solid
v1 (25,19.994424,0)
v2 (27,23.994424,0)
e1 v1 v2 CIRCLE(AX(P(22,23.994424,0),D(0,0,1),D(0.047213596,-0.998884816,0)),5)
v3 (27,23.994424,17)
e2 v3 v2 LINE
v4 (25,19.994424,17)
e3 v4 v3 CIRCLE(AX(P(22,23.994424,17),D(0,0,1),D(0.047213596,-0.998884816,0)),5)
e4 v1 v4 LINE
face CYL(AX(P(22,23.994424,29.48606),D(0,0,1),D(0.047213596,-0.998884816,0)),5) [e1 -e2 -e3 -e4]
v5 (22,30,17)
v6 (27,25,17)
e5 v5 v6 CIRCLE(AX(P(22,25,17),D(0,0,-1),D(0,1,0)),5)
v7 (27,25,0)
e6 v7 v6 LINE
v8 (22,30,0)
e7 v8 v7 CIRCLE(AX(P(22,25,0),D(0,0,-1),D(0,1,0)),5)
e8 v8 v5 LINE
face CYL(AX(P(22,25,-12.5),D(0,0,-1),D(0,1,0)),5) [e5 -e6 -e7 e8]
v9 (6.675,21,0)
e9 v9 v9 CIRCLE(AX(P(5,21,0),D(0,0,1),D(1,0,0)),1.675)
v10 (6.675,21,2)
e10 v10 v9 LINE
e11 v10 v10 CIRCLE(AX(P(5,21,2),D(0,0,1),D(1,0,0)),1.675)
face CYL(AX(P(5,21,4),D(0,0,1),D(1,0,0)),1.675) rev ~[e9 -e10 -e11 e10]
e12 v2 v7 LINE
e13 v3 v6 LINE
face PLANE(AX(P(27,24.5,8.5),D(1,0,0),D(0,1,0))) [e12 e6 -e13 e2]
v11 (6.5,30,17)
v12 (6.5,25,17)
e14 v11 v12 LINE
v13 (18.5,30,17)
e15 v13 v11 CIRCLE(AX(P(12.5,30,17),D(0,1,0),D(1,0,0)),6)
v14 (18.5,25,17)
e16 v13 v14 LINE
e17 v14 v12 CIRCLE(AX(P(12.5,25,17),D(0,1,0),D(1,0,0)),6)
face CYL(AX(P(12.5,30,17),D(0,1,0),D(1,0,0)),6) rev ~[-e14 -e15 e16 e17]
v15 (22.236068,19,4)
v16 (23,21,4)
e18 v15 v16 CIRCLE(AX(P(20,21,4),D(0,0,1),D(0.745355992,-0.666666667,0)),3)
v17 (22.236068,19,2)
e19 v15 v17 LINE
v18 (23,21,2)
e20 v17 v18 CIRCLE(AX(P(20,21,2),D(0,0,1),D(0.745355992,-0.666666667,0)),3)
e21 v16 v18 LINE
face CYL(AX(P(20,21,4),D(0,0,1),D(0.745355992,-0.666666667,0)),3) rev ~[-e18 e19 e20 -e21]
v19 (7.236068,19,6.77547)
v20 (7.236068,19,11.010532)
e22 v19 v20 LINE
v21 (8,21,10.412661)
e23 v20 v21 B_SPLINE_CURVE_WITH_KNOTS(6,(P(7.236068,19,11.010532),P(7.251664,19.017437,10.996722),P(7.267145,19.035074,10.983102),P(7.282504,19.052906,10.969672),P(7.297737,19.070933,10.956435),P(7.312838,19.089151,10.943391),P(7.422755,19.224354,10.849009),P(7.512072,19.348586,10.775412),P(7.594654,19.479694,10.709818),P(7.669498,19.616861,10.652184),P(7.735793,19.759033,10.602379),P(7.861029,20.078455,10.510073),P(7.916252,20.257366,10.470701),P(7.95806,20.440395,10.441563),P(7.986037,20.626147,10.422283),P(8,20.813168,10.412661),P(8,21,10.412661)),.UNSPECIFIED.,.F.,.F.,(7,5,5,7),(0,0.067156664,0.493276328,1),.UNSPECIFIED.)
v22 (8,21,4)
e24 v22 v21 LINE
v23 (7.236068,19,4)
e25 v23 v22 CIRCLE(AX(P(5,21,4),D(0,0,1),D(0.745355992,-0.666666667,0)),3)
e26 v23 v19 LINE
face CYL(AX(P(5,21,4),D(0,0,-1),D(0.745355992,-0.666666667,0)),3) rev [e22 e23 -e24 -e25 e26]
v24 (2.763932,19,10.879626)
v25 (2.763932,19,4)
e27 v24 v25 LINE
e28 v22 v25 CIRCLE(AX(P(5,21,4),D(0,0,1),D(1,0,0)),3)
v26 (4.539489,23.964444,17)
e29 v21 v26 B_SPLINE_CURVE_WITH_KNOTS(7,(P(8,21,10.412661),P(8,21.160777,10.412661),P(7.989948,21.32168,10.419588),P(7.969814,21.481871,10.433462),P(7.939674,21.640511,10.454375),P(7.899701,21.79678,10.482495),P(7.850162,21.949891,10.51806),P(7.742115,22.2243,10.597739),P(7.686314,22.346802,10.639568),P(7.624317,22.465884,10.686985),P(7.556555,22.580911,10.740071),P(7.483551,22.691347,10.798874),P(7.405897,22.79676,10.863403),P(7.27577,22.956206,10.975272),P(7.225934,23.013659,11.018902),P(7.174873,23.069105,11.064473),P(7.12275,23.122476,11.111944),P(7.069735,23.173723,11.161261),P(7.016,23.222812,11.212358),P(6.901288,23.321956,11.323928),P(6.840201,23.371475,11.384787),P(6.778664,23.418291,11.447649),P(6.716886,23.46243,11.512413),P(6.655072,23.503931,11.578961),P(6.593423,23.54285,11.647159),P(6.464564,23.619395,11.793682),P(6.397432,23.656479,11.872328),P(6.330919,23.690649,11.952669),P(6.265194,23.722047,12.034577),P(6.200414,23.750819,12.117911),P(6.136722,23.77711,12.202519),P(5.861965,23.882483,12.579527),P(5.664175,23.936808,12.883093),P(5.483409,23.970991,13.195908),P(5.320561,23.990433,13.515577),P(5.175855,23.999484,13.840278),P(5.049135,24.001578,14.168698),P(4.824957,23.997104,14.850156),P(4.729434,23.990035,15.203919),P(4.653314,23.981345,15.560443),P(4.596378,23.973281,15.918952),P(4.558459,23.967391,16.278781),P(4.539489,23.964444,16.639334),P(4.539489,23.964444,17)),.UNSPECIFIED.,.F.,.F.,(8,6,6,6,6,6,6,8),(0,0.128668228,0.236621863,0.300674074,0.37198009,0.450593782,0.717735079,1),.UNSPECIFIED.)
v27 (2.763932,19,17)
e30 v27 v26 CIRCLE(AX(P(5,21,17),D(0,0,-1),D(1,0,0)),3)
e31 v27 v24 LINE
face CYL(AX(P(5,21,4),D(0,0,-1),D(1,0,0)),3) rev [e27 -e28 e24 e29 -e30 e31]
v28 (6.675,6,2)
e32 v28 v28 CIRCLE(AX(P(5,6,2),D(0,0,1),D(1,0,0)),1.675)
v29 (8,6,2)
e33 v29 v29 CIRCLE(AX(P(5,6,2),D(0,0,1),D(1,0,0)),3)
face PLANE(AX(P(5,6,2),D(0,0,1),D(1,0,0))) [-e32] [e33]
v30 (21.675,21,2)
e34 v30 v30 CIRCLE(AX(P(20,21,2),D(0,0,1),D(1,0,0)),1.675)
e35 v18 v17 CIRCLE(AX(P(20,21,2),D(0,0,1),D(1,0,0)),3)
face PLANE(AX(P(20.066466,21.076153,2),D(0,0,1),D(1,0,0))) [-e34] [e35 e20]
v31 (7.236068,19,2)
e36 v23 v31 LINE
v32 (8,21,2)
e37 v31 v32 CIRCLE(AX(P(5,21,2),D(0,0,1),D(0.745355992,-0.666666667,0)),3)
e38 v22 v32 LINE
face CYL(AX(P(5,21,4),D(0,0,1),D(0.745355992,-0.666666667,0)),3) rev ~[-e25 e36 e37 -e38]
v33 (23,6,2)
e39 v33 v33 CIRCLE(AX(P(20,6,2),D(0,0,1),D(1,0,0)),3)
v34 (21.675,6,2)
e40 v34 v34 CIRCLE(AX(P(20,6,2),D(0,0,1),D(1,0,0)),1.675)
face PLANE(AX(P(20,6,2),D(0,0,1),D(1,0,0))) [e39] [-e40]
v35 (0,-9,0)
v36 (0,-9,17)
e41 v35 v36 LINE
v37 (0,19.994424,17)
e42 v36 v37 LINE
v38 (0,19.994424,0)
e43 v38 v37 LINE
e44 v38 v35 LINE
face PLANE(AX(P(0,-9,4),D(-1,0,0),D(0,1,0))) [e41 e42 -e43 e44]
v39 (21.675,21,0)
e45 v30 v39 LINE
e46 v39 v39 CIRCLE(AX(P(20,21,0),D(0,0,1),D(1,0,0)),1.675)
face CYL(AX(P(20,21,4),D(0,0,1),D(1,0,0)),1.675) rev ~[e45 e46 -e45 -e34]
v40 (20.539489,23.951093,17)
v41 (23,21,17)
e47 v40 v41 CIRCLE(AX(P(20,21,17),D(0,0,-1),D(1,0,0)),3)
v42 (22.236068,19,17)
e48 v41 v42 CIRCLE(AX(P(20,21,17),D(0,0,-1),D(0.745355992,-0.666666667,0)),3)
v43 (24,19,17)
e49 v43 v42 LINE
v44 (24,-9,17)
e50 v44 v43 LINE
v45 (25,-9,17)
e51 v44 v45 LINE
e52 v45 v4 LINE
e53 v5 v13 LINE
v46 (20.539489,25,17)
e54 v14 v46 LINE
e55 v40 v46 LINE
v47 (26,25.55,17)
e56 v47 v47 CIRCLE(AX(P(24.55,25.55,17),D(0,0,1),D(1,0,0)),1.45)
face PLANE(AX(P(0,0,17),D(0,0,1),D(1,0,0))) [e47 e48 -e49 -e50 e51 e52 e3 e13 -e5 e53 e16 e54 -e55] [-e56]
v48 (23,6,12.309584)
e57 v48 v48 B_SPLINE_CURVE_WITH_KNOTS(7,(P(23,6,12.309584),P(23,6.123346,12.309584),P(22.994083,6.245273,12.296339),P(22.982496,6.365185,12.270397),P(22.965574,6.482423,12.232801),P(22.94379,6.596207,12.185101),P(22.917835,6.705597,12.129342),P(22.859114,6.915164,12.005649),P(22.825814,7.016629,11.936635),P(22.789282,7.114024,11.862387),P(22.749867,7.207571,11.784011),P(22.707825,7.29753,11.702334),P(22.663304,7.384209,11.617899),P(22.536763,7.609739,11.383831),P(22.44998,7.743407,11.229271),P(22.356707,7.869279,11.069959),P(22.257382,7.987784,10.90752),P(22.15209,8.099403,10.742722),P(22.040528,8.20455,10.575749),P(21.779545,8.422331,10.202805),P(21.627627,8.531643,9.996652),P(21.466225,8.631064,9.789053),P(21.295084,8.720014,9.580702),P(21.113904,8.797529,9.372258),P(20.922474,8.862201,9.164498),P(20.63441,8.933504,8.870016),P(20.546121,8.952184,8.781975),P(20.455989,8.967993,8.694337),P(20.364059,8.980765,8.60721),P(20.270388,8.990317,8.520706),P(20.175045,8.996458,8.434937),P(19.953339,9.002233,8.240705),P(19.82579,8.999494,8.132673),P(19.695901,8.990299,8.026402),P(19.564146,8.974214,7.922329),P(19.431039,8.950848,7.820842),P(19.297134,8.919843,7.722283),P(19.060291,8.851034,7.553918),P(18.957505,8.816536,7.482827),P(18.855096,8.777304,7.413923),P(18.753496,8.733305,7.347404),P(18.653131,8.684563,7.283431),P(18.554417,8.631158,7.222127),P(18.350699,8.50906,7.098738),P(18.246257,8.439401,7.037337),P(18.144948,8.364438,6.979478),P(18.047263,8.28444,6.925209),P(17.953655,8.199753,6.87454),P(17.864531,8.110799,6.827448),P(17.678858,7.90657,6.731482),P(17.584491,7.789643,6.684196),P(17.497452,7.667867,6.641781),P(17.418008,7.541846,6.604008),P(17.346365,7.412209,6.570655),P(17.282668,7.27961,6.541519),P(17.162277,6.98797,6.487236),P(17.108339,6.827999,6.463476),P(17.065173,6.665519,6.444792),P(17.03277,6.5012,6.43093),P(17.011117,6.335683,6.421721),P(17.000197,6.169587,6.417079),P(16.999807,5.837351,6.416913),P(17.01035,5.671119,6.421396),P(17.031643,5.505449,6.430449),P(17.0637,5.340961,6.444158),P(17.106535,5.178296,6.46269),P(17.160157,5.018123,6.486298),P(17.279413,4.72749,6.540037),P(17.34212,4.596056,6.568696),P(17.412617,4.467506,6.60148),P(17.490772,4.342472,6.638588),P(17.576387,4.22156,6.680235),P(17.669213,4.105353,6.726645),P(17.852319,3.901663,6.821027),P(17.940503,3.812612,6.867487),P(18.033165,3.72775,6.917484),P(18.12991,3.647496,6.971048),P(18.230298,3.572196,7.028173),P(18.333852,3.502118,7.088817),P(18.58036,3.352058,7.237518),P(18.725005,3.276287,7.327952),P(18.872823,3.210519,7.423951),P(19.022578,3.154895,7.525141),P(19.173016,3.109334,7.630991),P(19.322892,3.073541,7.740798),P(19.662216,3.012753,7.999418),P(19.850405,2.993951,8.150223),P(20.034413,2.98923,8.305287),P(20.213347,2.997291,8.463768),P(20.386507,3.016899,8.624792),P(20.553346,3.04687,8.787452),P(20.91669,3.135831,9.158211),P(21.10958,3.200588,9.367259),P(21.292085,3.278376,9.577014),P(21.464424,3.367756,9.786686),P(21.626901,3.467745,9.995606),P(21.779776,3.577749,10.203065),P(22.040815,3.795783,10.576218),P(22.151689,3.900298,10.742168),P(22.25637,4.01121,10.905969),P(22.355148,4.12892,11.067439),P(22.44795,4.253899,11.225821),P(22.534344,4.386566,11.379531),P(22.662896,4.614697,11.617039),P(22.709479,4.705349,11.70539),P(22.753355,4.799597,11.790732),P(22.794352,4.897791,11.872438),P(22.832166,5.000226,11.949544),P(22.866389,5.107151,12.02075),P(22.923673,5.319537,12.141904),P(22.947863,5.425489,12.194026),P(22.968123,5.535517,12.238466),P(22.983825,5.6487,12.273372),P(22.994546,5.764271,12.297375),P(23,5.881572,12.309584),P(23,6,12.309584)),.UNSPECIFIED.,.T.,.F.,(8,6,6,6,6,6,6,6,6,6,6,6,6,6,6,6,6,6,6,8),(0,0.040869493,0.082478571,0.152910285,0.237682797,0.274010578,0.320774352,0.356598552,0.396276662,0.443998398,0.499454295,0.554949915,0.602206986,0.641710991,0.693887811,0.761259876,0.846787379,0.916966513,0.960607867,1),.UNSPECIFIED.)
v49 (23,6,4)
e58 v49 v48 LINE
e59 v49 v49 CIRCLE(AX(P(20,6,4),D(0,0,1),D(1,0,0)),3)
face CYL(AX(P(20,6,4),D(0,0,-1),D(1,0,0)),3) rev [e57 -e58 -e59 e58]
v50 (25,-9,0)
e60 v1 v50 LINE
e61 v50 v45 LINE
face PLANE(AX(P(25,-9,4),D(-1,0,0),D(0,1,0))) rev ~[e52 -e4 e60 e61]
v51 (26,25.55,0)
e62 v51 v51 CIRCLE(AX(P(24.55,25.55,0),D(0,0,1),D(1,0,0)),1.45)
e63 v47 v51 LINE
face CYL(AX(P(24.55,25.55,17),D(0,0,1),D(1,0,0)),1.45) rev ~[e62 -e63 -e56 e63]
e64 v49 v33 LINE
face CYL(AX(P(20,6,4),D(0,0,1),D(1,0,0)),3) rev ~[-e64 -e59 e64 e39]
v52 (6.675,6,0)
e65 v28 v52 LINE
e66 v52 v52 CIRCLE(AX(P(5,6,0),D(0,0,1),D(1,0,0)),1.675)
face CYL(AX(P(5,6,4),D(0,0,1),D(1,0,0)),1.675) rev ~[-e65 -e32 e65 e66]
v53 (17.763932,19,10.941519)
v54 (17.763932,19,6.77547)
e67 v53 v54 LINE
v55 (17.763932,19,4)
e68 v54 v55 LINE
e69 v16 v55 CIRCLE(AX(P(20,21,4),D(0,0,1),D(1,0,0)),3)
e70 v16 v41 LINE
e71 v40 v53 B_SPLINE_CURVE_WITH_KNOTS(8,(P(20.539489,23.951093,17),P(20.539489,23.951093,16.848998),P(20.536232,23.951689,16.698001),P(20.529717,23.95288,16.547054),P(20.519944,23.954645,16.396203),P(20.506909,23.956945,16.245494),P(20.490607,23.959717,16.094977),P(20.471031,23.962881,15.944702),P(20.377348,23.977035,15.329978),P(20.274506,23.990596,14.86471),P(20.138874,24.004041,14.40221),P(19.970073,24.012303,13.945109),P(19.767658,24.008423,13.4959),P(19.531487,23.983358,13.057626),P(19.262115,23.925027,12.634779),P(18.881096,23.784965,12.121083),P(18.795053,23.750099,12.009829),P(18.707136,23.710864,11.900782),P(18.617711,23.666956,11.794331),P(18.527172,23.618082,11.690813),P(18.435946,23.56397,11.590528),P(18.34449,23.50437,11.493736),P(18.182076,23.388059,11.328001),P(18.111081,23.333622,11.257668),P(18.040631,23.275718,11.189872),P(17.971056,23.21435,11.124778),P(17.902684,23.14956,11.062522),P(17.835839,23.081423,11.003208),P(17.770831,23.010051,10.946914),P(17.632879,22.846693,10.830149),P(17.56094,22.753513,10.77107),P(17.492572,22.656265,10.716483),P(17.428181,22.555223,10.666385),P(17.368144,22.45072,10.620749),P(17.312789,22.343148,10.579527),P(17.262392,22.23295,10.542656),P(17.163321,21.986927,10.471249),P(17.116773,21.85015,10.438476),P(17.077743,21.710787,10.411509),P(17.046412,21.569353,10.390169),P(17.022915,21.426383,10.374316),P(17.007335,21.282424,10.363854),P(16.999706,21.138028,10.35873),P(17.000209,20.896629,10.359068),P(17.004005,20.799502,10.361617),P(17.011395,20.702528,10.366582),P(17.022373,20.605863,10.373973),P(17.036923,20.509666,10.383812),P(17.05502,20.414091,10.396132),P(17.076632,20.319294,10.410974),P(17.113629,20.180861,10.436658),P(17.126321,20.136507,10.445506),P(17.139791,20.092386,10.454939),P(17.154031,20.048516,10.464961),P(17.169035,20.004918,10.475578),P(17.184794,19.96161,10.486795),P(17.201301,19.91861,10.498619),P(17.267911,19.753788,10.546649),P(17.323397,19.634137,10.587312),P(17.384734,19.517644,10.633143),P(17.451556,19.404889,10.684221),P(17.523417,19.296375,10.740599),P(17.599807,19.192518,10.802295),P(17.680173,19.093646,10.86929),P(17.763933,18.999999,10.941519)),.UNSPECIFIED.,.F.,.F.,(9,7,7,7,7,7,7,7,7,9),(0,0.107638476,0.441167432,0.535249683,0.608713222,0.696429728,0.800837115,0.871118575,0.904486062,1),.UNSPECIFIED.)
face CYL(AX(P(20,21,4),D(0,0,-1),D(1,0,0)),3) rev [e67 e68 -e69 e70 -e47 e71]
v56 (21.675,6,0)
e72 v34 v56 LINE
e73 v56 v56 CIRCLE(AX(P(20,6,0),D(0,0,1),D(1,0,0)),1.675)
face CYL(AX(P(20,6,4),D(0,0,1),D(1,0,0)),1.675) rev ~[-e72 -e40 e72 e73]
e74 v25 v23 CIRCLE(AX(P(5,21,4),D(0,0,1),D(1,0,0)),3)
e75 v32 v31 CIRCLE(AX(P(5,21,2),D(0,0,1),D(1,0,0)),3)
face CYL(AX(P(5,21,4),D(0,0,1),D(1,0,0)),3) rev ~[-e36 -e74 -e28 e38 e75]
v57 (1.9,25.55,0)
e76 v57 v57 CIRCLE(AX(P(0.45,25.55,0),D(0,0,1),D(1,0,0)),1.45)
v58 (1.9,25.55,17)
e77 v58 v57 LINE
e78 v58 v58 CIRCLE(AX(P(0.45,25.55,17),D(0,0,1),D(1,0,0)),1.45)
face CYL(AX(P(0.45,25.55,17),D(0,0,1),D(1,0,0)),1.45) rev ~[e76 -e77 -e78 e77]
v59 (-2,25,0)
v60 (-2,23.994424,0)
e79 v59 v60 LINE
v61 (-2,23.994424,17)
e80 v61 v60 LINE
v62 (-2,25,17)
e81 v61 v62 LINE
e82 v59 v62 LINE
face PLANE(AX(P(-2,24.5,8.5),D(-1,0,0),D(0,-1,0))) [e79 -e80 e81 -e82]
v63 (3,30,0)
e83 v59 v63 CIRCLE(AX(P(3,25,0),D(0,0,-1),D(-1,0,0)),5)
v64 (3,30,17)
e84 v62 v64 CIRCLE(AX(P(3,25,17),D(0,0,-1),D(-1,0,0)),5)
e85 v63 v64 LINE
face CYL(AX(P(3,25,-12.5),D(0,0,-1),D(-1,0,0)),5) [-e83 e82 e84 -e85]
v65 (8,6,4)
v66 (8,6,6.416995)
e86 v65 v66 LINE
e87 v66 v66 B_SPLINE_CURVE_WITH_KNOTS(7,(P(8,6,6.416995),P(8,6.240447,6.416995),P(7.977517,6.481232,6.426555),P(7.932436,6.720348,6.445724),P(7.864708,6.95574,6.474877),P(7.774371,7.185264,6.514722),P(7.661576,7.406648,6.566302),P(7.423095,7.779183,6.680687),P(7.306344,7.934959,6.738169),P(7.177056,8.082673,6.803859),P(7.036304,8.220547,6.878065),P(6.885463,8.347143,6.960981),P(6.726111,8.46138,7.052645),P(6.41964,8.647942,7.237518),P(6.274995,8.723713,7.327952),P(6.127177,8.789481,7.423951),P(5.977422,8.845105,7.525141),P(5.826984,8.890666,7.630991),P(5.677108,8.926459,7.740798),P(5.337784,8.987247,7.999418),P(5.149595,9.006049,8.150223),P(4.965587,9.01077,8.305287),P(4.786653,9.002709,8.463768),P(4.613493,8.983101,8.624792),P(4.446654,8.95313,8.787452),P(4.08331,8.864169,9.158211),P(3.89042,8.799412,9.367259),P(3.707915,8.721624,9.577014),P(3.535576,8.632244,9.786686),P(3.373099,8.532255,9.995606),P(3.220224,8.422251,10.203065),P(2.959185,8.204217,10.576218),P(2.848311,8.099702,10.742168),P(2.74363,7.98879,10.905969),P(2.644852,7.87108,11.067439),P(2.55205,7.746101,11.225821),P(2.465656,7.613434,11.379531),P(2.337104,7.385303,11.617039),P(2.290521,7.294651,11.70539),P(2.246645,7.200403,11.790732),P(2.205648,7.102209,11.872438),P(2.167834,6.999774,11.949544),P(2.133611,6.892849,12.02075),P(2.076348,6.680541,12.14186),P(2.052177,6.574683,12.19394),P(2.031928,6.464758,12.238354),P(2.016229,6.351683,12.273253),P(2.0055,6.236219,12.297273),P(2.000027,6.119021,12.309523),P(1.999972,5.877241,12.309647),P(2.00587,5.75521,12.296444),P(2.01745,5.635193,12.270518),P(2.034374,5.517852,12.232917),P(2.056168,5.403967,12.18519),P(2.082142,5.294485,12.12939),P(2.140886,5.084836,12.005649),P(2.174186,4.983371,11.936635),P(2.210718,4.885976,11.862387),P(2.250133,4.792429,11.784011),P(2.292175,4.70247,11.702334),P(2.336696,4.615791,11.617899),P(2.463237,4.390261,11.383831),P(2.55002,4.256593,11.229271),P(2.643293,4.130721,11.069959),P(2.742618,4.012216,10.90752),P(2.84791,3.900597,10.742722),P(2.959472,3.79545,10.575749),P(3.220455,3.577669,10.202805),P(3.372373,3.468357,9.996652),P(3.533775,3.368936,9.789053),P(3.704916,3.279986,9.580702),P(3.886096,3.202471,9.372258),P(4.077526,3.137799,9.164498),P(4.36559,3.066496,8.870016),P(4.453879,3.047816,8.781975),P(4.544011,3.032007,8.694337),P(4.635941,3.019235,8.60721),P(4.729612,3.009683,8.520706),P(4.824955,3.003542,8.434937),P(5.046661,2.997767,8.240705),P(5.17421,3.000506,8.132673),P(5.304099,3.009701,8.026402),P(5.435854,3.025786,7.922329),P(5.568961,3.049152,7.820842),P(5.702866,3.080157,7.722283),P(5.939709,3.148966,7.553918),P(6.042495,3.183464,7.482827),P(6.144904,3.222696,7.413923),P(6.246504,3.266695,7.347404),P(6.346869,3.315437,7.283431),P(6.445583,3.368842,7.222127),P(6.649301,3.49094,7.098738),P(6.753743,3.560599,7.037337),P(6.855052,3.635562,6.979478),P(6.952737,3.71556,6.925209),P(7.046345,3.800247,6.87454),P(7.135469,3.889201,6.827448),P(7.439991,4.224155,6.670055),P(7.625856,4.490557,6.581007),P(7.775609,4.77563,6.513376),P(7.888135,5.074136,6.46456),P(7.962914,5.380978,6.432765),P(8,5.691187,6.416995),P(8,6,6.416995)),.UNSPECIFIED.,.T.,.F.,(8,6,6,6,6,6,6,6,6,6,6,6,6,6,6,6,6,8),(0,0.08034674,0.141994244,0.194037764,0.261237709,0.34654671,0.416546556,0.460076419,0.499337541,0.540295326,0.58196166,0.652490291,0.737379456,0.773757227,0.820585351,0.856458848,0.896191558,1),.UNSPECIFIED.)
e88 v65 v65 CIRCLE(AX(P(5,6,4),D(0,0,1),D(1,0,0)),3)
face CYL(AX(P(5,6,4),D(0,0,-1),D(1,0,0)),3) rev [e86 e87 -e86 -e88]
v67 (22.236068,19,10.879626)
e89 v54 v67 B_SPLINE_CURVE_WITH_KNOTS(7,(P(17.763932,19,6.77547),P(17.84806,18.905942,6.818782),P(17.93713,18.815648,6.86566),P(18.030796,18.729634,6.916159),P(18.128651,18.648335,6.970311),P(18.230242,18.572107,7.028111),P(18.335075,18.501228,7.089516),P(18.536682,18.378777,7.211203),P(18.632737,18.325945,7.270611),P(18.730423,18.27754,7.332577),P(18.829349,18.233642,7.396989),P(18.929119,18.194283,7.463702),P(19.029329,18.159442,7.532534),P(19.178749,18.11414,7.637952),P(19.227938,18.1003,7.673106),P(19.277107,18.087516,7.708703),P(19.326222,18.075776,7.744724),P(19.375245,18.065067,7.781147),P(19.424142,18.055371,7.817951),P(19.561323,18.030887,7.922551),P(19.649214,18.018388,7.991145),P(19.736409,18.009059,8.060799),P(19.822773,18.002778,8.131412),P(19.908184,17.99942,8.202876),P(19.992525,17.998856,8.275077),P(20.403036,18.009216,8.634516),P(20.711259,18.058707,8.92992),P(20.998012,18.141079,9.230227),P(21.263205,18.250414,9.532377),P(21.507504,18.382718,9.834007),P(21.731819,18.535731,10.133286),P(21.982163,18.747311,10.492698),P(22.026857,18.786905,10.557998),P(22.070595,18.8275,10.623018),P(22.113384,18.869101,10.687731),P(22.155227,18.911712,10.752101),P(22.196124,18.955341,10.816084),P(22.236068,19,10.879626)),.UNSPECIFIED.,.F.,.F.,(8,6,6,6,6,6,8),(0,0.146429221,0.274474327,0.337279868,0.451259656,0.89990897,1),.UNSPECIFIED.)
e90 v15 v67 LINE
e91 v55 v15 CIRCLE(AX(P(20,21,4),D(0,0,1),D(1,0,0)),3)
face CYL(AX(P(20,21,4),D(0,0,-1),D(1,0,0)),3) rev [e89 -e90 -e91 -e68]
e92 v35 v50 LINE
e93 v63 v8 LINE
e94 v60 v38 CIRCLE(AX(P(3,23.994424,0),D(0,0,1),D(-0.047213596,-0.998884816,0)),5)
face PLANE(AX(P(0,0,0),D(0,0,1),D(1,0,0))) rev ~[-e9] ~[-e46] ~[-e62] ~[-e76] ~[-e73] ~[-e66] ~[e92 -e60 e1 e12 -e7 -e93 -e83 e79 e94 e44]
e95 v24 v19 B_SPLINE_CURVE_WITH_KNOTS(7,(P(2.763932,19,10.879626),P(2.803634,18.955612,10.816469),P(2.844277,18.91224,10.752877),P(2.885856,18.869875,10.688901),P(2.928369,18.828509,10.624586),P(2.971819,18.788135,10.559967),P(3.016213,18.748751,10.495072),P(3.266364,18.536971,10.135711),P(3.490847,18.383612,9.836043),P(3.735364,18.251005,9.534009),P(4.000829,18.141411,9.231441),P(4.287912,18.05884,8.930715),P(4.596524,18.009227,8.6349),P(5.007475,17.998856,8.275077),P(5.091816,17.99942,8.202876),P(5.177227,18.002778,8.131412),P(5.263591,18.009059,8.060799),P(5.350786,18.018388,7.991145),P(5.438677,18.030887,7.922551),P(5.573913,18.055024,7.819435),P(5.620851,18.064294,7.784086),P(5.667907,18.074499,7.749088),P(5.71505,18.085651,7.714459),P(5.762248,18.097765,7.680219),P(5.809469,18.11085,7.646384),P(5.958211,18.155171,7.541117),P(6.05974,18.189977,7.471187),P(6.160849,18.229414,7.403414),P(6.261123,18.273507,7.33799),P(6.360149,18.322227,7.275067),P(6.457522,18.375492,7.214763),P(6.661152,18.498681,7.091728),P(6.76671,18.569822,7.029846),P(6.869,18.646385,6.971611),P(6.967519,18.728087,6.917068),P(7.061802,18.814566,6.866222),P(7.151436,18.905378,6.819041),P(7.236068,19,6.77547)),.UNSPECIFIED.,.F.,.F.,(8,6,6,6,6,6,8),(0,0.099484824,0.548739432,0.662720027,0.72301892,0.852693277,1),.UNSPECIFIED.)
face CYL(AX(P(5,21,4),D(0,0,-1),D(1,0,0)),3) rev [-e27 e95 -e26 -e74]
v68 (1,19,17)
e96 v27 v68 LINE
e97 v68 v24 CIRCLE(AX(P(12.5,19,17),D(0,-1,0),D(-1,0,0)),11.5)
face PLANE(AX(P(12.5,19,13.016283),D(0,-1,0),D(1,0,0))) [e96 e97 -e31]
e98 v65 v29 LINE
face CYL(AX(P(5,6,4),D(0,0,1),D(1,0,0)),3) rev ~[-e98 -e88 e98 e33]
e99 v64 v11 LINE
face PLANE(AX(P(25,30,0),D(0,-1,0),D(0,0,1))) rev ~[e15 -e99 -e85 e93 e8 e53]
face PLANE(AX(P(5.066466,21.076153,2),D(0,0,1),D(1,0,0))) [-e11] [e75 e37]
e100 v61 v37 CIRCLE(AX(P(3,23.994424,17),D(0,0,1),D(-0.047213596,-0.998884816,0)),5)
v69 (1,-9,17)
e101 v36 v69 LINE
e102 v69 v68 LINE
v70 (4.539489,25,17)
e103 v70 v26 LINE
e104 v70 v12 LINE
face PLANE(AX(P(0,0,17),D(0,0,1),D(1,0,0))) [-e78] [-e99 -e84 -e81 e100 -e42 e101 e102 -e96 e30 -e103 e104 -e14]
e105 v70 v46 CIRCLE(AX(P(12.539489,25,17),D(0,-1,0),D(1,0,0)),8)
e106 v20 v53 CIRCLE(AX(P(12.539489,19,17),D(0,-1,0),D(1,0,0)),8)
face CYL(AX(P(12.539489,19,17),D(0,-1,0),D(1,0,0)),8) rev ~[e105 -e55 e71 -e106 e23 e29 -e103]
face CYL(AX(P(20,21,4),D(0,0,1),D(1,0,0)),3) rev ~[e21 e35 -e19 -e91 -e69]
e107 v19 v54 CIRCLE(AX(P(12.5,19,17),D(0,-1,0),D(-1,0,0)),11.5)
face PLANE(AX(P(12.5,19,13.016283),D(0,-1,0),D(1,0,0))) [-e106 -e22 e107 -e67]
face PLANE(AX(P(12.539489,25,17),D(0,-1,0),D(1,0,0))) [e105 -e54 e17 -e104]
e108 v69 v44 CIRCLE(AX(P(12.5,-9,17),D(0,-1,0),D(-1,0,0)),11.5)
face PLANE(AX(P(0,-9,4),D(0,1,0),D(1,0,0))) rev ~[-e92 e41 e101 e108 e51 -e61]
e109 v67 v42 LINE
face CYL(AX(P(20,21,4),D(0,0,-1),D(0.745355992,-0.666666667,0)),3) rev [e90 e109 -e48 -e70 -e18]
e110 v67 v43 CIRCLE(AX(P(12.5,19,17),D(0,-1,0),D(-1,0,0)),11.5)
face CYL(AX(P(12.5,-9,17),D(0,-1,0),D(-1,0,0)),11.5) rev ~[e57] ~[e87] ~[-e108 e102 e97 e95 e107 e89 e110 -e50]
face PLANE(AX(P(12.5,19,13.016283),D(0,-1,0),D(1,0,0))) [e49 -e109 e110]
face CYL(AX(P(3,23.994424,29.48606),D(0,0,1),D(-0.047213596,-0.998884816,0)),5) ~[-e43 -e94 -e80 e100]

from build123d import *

# Parameters (mm, degrees)
F0_W           = 25
F0_H           = 30
F1_DEPTH       = 4
F2_W           = 25
F2_H           = 11
F3_DEPTH       = 13
F4_R           = 1.675
F5_DEPTH       = 25
F5_DEPTH_BACK  = 25
F7_DEPTH       = 6
F8_R           = 8
F9_DEPTH       = 6
F4_R_2         = 3
F10_DEPTH      = 2
F10_DEPTH_BACK = 25
F12_DEPTH      = 2
F13_W          = 11
F13_H          = 17
F14_DEPTH      = 2
F15_R          = 1.45
F16_DEPTH      = 25
F17_T1_DEPTH   = 42
F17_T6_DEPTH   = 41.9721204096
F17_T11_DEPTH  = 41.9721204096
F18_DEPTH      = 9
F19_DEPTH      = 13
F21_DEPTH      = 28


# Not quite as in the source:
# - a fillet or chamfer that OpenCascade refuses, or shapes differently, is made with other operations: its cross-section is extruded or revolved along the edge and cut away or added
# - a feature names something its author has since deleted; it is built from what else it names


with BuildPart() as f1:
    # F0 (on Top) → F1 (new body)
    with BuildSketch(Plane.XY):
        with Locations((12.5, 15)):
            Rectangle(F0_W, F0_H)
    extrude(amount=F1_DEPTH)

    # F2 (on face) → F3 (join)
    with BuildSketch(Plane.XY.offset(4)):
        with Locations((12.5, 24.5)):
            Rectangle(F2_W, F2_H)
    extrude(amount=F3_DEPTH)

    # F4 (on face) → F5 (cut, two sides)
    with BuildSketch(Plane.XY.offset(4)) as f5_sk:
        with Locations((5, 21)):
            Circle(F4_R)
        with Locations((20, 21)):
            Circle(F4_R)
        with Locations((20, 6)):
            Circle(F4_R)
        with Locations((5, 6)):
            Circle(F4_R)
    extrude(amount=-F5_DEPTH, mode=Mode.SUBTRACT)
    extrude(f5_sk.sketch, amount=F5_DEPTH_BACK, mode=Mode.SUBTRACT)

    # F6 (on face) → F7 (cut)
    with BuildSketch(Plane(origin=(0, 30, 0), x_dir=(-1, 0, 0), z_dir=(0, 1, 0))):
        with BuildLine():
            ThreePointArc((-18.5, 17), (-12.5, 11), (-6.5, 17))
            Line((-6.5, 17), (-18.5, 17))
        make_face()
    extrude(amount=-F7_DEPTH, mode=Mode.SUBTRACT)

    # F8 (on face) → F9 (cut)
    with BuildSketch(Plane.XZ.offset(-19)):
        with Locations((12.5394891948, 17)):
            Circle(F8_R)
    extrude(amount=-F9_DEPTH, mode=Mode.SUBTRACT)

    # F4 (on face) → F10 (cut, two sides)
    with BuildSketch(Plane.XY.offset(4)) as f10_sk:
        with BuildLine():
            ThreePointArc((7.2360679775, 19), (7.8025170769, 19.9295337307), (8, 21))
            ThreePointArc((8, 21), (3.9295337307, 23.8025170769), (2.7639320225, 19))
            Line((2.7639320225, 19), (7.2360679775, 19))
        make_face()
        with Locations((5, 21)):
            Circle(F4_R, mode=Mode.SUBTRACT)
        with BuildLine():
            ThreePointArc((23, 21), (18.9295337307, 23.8025170769), (17.7639320225, 19))
            Line((17.7639320225, 19), (22.2360679775, 19))
            ThreePointArc((22.2360679775, 19), (22.8025170769, 19.9295337307), (23, 21))
        make_face()
        with Locations((20, 21)):
            Circle(F4_R, mode=Mode.SUBTRACT)
        with Locations((20, 6)):
            Circle(F4_R_2)
        with Locations((20, 6)):
            Circle(F4_R, mode=Mode.SUBTRACT)
        with Locations((5, 6)):
            Circle(F4_R_2)
        with Locations((5, 6)):
            Circle(F4_R, mode=Mode.SUBTRACT)
        with BuildLine():
            Line((22.2360679775, 19), (17.7639320225, 19))
            ThreePointArc((17.7639320225, 19), (20, 18), (22.2360679775, 19))
        make_face()
        with BuildLine():
            Line((7.2360679775, 19), (2.7639320225, 19))
            ThreePointArc((2.7639320225, 19), (5, 18), (7.2360679775, 19))
        make_face()
    extrude(amount=-F10_DEPTH, mode=Mode.SUBTRACT)
    extrude(f10_sk.sketch, amount=F10_DEPTH_BACK, mode=Mode.SUBTRACT)

    # F11 (on face) → F12 (join)
    with BuildSketch(Plane(origin=(0, 0, 0), x_dir=(0, -1, 0), z_dir=(-1, 0, 0))):
        Polygon((-30, 17), (-30, 0), (-19, 0), (-19, 4), (-19, 17), align=None)
    extrude(amount=F12_DEPTH)

    # F13 (on face) → F14 (join)
    with BuildSketch(Plane.YZ.offset(25)):
        with Locations((24.5, 8.5)):
            Rectangle(F13_W, F13_H)
    extrude(amount=F14_DEPTH)

    # F15 (on face) → F16 (cut)
    with BuildSketch(Plane.XY.offset(17)):
        with Locations((0.45, 25.55)):
            Circle(F15_R)
        with Locations((24.55, 25.55)):
            Circle(F15_R)
    extrude(amount=-F16_DEPTH, mode=Mode.SUBTRACT)

    # F17: fillet of radius 5 on 4 edges, made by hand

    # F17_s2 → F17_t1 (cut)
    with BuildSketch(Plane.XY.offset(-12.5)):
        with BuildLine():
            ThreePointArc((-2, 25), (-0.5355339059, 28.5355339059), (3, 30))
            Line((3, 30), (-2, 30))
            Line((-2, 30), (-2, 25))
        make_face()
        with BuildLine():
            ThreePointArc((22, 30), (25.5355339059, 28.5355339059), (27, 25))
            Line((27, 25), (27, 30))
            Line((27, 30), (22, 30))
        make_face()
    extrude(amount=F17_T1_DEPTH, mode=Mode.SUBTRACT)


with BuildPart() as f17_tool4:
    # F17_s5 → F17_t6 (new body)
    with BuildSketch(Plane.XY.offset(29.4860602048)):
        with BuildLine():
            ThreePointArc((2.7639320225, 19), (-0.6180339887, 20.5433619184), (-2, 23.9944240819))
            Line((-2, 23.9944240819), (-2, 19))
            Line((-2, 19), (2.7639320225, 19))
        make_face()
    extrude(amount=-F17_T6_DEPTH)

    split(bisect_by=Plane.YZ, keep=Keep.BOTTOM)


with BuildPart() as f1_1:
    add(f1.part)

    # F17_t3: cut F17_tool4
    add(f17_tool4.part, mode=Mode.SUBTRACT)


with BuildPart() as f17_tool9:
    # F17_s10 → F17_t11 (new body)
    with BuildSketch(Plane.XY.offset(29.4860602048)):
        with BuildLine():
            ThreePointArc((22.2360679775, 19), (25.6180339887, 20.5433619184), (27, 23.9944240819))
            Line((27, 23.9944240819), (27, 19))
            Line((27, 19), (22.2360679775, 19))
        make_face()
    extrude(amount=-F17_T11_DEPTH)

    split(bisect_by=Plane.YZ.offset(25), keep=Keep.TOP)


with BuildPart() as f1_2:
    add(f1_1.part)

    # F17_t8: cut F17_tool9
    add(f17_tool9.part, mode=Mode.SUBTRACT)

    # F18 (add): a face of the model
    f18_faces = [f1_2.faces().sort_by_distance(p)[0] for p in [
        (12.5, 0, 2),
    ]]
    extrude(f18_faces, amount=F18_DEPTH)

    # F19 (add): a face of the model
    f19_faces = [f1_2.faces().sort_by_distance(p)[0] for p in [
        (12.5, 4.7791140559, 4),
    ]]
    extrude(f19_faces, amount=F19_DEPTH)

    # F20 (on face) → F21 (cut, through all)
    with BuildSketch(Plane.XZ.offset(9)):
        with BuildLine():
            ThreePointArc((1, 17), (12.5, 5.5), (24, 17))
            Line((24, 17), (1, 17))
        make_face()
    extrude(amount=-F21_DEPTH, mode=Mode.SUBTRACT)


solid = f1_2.part
